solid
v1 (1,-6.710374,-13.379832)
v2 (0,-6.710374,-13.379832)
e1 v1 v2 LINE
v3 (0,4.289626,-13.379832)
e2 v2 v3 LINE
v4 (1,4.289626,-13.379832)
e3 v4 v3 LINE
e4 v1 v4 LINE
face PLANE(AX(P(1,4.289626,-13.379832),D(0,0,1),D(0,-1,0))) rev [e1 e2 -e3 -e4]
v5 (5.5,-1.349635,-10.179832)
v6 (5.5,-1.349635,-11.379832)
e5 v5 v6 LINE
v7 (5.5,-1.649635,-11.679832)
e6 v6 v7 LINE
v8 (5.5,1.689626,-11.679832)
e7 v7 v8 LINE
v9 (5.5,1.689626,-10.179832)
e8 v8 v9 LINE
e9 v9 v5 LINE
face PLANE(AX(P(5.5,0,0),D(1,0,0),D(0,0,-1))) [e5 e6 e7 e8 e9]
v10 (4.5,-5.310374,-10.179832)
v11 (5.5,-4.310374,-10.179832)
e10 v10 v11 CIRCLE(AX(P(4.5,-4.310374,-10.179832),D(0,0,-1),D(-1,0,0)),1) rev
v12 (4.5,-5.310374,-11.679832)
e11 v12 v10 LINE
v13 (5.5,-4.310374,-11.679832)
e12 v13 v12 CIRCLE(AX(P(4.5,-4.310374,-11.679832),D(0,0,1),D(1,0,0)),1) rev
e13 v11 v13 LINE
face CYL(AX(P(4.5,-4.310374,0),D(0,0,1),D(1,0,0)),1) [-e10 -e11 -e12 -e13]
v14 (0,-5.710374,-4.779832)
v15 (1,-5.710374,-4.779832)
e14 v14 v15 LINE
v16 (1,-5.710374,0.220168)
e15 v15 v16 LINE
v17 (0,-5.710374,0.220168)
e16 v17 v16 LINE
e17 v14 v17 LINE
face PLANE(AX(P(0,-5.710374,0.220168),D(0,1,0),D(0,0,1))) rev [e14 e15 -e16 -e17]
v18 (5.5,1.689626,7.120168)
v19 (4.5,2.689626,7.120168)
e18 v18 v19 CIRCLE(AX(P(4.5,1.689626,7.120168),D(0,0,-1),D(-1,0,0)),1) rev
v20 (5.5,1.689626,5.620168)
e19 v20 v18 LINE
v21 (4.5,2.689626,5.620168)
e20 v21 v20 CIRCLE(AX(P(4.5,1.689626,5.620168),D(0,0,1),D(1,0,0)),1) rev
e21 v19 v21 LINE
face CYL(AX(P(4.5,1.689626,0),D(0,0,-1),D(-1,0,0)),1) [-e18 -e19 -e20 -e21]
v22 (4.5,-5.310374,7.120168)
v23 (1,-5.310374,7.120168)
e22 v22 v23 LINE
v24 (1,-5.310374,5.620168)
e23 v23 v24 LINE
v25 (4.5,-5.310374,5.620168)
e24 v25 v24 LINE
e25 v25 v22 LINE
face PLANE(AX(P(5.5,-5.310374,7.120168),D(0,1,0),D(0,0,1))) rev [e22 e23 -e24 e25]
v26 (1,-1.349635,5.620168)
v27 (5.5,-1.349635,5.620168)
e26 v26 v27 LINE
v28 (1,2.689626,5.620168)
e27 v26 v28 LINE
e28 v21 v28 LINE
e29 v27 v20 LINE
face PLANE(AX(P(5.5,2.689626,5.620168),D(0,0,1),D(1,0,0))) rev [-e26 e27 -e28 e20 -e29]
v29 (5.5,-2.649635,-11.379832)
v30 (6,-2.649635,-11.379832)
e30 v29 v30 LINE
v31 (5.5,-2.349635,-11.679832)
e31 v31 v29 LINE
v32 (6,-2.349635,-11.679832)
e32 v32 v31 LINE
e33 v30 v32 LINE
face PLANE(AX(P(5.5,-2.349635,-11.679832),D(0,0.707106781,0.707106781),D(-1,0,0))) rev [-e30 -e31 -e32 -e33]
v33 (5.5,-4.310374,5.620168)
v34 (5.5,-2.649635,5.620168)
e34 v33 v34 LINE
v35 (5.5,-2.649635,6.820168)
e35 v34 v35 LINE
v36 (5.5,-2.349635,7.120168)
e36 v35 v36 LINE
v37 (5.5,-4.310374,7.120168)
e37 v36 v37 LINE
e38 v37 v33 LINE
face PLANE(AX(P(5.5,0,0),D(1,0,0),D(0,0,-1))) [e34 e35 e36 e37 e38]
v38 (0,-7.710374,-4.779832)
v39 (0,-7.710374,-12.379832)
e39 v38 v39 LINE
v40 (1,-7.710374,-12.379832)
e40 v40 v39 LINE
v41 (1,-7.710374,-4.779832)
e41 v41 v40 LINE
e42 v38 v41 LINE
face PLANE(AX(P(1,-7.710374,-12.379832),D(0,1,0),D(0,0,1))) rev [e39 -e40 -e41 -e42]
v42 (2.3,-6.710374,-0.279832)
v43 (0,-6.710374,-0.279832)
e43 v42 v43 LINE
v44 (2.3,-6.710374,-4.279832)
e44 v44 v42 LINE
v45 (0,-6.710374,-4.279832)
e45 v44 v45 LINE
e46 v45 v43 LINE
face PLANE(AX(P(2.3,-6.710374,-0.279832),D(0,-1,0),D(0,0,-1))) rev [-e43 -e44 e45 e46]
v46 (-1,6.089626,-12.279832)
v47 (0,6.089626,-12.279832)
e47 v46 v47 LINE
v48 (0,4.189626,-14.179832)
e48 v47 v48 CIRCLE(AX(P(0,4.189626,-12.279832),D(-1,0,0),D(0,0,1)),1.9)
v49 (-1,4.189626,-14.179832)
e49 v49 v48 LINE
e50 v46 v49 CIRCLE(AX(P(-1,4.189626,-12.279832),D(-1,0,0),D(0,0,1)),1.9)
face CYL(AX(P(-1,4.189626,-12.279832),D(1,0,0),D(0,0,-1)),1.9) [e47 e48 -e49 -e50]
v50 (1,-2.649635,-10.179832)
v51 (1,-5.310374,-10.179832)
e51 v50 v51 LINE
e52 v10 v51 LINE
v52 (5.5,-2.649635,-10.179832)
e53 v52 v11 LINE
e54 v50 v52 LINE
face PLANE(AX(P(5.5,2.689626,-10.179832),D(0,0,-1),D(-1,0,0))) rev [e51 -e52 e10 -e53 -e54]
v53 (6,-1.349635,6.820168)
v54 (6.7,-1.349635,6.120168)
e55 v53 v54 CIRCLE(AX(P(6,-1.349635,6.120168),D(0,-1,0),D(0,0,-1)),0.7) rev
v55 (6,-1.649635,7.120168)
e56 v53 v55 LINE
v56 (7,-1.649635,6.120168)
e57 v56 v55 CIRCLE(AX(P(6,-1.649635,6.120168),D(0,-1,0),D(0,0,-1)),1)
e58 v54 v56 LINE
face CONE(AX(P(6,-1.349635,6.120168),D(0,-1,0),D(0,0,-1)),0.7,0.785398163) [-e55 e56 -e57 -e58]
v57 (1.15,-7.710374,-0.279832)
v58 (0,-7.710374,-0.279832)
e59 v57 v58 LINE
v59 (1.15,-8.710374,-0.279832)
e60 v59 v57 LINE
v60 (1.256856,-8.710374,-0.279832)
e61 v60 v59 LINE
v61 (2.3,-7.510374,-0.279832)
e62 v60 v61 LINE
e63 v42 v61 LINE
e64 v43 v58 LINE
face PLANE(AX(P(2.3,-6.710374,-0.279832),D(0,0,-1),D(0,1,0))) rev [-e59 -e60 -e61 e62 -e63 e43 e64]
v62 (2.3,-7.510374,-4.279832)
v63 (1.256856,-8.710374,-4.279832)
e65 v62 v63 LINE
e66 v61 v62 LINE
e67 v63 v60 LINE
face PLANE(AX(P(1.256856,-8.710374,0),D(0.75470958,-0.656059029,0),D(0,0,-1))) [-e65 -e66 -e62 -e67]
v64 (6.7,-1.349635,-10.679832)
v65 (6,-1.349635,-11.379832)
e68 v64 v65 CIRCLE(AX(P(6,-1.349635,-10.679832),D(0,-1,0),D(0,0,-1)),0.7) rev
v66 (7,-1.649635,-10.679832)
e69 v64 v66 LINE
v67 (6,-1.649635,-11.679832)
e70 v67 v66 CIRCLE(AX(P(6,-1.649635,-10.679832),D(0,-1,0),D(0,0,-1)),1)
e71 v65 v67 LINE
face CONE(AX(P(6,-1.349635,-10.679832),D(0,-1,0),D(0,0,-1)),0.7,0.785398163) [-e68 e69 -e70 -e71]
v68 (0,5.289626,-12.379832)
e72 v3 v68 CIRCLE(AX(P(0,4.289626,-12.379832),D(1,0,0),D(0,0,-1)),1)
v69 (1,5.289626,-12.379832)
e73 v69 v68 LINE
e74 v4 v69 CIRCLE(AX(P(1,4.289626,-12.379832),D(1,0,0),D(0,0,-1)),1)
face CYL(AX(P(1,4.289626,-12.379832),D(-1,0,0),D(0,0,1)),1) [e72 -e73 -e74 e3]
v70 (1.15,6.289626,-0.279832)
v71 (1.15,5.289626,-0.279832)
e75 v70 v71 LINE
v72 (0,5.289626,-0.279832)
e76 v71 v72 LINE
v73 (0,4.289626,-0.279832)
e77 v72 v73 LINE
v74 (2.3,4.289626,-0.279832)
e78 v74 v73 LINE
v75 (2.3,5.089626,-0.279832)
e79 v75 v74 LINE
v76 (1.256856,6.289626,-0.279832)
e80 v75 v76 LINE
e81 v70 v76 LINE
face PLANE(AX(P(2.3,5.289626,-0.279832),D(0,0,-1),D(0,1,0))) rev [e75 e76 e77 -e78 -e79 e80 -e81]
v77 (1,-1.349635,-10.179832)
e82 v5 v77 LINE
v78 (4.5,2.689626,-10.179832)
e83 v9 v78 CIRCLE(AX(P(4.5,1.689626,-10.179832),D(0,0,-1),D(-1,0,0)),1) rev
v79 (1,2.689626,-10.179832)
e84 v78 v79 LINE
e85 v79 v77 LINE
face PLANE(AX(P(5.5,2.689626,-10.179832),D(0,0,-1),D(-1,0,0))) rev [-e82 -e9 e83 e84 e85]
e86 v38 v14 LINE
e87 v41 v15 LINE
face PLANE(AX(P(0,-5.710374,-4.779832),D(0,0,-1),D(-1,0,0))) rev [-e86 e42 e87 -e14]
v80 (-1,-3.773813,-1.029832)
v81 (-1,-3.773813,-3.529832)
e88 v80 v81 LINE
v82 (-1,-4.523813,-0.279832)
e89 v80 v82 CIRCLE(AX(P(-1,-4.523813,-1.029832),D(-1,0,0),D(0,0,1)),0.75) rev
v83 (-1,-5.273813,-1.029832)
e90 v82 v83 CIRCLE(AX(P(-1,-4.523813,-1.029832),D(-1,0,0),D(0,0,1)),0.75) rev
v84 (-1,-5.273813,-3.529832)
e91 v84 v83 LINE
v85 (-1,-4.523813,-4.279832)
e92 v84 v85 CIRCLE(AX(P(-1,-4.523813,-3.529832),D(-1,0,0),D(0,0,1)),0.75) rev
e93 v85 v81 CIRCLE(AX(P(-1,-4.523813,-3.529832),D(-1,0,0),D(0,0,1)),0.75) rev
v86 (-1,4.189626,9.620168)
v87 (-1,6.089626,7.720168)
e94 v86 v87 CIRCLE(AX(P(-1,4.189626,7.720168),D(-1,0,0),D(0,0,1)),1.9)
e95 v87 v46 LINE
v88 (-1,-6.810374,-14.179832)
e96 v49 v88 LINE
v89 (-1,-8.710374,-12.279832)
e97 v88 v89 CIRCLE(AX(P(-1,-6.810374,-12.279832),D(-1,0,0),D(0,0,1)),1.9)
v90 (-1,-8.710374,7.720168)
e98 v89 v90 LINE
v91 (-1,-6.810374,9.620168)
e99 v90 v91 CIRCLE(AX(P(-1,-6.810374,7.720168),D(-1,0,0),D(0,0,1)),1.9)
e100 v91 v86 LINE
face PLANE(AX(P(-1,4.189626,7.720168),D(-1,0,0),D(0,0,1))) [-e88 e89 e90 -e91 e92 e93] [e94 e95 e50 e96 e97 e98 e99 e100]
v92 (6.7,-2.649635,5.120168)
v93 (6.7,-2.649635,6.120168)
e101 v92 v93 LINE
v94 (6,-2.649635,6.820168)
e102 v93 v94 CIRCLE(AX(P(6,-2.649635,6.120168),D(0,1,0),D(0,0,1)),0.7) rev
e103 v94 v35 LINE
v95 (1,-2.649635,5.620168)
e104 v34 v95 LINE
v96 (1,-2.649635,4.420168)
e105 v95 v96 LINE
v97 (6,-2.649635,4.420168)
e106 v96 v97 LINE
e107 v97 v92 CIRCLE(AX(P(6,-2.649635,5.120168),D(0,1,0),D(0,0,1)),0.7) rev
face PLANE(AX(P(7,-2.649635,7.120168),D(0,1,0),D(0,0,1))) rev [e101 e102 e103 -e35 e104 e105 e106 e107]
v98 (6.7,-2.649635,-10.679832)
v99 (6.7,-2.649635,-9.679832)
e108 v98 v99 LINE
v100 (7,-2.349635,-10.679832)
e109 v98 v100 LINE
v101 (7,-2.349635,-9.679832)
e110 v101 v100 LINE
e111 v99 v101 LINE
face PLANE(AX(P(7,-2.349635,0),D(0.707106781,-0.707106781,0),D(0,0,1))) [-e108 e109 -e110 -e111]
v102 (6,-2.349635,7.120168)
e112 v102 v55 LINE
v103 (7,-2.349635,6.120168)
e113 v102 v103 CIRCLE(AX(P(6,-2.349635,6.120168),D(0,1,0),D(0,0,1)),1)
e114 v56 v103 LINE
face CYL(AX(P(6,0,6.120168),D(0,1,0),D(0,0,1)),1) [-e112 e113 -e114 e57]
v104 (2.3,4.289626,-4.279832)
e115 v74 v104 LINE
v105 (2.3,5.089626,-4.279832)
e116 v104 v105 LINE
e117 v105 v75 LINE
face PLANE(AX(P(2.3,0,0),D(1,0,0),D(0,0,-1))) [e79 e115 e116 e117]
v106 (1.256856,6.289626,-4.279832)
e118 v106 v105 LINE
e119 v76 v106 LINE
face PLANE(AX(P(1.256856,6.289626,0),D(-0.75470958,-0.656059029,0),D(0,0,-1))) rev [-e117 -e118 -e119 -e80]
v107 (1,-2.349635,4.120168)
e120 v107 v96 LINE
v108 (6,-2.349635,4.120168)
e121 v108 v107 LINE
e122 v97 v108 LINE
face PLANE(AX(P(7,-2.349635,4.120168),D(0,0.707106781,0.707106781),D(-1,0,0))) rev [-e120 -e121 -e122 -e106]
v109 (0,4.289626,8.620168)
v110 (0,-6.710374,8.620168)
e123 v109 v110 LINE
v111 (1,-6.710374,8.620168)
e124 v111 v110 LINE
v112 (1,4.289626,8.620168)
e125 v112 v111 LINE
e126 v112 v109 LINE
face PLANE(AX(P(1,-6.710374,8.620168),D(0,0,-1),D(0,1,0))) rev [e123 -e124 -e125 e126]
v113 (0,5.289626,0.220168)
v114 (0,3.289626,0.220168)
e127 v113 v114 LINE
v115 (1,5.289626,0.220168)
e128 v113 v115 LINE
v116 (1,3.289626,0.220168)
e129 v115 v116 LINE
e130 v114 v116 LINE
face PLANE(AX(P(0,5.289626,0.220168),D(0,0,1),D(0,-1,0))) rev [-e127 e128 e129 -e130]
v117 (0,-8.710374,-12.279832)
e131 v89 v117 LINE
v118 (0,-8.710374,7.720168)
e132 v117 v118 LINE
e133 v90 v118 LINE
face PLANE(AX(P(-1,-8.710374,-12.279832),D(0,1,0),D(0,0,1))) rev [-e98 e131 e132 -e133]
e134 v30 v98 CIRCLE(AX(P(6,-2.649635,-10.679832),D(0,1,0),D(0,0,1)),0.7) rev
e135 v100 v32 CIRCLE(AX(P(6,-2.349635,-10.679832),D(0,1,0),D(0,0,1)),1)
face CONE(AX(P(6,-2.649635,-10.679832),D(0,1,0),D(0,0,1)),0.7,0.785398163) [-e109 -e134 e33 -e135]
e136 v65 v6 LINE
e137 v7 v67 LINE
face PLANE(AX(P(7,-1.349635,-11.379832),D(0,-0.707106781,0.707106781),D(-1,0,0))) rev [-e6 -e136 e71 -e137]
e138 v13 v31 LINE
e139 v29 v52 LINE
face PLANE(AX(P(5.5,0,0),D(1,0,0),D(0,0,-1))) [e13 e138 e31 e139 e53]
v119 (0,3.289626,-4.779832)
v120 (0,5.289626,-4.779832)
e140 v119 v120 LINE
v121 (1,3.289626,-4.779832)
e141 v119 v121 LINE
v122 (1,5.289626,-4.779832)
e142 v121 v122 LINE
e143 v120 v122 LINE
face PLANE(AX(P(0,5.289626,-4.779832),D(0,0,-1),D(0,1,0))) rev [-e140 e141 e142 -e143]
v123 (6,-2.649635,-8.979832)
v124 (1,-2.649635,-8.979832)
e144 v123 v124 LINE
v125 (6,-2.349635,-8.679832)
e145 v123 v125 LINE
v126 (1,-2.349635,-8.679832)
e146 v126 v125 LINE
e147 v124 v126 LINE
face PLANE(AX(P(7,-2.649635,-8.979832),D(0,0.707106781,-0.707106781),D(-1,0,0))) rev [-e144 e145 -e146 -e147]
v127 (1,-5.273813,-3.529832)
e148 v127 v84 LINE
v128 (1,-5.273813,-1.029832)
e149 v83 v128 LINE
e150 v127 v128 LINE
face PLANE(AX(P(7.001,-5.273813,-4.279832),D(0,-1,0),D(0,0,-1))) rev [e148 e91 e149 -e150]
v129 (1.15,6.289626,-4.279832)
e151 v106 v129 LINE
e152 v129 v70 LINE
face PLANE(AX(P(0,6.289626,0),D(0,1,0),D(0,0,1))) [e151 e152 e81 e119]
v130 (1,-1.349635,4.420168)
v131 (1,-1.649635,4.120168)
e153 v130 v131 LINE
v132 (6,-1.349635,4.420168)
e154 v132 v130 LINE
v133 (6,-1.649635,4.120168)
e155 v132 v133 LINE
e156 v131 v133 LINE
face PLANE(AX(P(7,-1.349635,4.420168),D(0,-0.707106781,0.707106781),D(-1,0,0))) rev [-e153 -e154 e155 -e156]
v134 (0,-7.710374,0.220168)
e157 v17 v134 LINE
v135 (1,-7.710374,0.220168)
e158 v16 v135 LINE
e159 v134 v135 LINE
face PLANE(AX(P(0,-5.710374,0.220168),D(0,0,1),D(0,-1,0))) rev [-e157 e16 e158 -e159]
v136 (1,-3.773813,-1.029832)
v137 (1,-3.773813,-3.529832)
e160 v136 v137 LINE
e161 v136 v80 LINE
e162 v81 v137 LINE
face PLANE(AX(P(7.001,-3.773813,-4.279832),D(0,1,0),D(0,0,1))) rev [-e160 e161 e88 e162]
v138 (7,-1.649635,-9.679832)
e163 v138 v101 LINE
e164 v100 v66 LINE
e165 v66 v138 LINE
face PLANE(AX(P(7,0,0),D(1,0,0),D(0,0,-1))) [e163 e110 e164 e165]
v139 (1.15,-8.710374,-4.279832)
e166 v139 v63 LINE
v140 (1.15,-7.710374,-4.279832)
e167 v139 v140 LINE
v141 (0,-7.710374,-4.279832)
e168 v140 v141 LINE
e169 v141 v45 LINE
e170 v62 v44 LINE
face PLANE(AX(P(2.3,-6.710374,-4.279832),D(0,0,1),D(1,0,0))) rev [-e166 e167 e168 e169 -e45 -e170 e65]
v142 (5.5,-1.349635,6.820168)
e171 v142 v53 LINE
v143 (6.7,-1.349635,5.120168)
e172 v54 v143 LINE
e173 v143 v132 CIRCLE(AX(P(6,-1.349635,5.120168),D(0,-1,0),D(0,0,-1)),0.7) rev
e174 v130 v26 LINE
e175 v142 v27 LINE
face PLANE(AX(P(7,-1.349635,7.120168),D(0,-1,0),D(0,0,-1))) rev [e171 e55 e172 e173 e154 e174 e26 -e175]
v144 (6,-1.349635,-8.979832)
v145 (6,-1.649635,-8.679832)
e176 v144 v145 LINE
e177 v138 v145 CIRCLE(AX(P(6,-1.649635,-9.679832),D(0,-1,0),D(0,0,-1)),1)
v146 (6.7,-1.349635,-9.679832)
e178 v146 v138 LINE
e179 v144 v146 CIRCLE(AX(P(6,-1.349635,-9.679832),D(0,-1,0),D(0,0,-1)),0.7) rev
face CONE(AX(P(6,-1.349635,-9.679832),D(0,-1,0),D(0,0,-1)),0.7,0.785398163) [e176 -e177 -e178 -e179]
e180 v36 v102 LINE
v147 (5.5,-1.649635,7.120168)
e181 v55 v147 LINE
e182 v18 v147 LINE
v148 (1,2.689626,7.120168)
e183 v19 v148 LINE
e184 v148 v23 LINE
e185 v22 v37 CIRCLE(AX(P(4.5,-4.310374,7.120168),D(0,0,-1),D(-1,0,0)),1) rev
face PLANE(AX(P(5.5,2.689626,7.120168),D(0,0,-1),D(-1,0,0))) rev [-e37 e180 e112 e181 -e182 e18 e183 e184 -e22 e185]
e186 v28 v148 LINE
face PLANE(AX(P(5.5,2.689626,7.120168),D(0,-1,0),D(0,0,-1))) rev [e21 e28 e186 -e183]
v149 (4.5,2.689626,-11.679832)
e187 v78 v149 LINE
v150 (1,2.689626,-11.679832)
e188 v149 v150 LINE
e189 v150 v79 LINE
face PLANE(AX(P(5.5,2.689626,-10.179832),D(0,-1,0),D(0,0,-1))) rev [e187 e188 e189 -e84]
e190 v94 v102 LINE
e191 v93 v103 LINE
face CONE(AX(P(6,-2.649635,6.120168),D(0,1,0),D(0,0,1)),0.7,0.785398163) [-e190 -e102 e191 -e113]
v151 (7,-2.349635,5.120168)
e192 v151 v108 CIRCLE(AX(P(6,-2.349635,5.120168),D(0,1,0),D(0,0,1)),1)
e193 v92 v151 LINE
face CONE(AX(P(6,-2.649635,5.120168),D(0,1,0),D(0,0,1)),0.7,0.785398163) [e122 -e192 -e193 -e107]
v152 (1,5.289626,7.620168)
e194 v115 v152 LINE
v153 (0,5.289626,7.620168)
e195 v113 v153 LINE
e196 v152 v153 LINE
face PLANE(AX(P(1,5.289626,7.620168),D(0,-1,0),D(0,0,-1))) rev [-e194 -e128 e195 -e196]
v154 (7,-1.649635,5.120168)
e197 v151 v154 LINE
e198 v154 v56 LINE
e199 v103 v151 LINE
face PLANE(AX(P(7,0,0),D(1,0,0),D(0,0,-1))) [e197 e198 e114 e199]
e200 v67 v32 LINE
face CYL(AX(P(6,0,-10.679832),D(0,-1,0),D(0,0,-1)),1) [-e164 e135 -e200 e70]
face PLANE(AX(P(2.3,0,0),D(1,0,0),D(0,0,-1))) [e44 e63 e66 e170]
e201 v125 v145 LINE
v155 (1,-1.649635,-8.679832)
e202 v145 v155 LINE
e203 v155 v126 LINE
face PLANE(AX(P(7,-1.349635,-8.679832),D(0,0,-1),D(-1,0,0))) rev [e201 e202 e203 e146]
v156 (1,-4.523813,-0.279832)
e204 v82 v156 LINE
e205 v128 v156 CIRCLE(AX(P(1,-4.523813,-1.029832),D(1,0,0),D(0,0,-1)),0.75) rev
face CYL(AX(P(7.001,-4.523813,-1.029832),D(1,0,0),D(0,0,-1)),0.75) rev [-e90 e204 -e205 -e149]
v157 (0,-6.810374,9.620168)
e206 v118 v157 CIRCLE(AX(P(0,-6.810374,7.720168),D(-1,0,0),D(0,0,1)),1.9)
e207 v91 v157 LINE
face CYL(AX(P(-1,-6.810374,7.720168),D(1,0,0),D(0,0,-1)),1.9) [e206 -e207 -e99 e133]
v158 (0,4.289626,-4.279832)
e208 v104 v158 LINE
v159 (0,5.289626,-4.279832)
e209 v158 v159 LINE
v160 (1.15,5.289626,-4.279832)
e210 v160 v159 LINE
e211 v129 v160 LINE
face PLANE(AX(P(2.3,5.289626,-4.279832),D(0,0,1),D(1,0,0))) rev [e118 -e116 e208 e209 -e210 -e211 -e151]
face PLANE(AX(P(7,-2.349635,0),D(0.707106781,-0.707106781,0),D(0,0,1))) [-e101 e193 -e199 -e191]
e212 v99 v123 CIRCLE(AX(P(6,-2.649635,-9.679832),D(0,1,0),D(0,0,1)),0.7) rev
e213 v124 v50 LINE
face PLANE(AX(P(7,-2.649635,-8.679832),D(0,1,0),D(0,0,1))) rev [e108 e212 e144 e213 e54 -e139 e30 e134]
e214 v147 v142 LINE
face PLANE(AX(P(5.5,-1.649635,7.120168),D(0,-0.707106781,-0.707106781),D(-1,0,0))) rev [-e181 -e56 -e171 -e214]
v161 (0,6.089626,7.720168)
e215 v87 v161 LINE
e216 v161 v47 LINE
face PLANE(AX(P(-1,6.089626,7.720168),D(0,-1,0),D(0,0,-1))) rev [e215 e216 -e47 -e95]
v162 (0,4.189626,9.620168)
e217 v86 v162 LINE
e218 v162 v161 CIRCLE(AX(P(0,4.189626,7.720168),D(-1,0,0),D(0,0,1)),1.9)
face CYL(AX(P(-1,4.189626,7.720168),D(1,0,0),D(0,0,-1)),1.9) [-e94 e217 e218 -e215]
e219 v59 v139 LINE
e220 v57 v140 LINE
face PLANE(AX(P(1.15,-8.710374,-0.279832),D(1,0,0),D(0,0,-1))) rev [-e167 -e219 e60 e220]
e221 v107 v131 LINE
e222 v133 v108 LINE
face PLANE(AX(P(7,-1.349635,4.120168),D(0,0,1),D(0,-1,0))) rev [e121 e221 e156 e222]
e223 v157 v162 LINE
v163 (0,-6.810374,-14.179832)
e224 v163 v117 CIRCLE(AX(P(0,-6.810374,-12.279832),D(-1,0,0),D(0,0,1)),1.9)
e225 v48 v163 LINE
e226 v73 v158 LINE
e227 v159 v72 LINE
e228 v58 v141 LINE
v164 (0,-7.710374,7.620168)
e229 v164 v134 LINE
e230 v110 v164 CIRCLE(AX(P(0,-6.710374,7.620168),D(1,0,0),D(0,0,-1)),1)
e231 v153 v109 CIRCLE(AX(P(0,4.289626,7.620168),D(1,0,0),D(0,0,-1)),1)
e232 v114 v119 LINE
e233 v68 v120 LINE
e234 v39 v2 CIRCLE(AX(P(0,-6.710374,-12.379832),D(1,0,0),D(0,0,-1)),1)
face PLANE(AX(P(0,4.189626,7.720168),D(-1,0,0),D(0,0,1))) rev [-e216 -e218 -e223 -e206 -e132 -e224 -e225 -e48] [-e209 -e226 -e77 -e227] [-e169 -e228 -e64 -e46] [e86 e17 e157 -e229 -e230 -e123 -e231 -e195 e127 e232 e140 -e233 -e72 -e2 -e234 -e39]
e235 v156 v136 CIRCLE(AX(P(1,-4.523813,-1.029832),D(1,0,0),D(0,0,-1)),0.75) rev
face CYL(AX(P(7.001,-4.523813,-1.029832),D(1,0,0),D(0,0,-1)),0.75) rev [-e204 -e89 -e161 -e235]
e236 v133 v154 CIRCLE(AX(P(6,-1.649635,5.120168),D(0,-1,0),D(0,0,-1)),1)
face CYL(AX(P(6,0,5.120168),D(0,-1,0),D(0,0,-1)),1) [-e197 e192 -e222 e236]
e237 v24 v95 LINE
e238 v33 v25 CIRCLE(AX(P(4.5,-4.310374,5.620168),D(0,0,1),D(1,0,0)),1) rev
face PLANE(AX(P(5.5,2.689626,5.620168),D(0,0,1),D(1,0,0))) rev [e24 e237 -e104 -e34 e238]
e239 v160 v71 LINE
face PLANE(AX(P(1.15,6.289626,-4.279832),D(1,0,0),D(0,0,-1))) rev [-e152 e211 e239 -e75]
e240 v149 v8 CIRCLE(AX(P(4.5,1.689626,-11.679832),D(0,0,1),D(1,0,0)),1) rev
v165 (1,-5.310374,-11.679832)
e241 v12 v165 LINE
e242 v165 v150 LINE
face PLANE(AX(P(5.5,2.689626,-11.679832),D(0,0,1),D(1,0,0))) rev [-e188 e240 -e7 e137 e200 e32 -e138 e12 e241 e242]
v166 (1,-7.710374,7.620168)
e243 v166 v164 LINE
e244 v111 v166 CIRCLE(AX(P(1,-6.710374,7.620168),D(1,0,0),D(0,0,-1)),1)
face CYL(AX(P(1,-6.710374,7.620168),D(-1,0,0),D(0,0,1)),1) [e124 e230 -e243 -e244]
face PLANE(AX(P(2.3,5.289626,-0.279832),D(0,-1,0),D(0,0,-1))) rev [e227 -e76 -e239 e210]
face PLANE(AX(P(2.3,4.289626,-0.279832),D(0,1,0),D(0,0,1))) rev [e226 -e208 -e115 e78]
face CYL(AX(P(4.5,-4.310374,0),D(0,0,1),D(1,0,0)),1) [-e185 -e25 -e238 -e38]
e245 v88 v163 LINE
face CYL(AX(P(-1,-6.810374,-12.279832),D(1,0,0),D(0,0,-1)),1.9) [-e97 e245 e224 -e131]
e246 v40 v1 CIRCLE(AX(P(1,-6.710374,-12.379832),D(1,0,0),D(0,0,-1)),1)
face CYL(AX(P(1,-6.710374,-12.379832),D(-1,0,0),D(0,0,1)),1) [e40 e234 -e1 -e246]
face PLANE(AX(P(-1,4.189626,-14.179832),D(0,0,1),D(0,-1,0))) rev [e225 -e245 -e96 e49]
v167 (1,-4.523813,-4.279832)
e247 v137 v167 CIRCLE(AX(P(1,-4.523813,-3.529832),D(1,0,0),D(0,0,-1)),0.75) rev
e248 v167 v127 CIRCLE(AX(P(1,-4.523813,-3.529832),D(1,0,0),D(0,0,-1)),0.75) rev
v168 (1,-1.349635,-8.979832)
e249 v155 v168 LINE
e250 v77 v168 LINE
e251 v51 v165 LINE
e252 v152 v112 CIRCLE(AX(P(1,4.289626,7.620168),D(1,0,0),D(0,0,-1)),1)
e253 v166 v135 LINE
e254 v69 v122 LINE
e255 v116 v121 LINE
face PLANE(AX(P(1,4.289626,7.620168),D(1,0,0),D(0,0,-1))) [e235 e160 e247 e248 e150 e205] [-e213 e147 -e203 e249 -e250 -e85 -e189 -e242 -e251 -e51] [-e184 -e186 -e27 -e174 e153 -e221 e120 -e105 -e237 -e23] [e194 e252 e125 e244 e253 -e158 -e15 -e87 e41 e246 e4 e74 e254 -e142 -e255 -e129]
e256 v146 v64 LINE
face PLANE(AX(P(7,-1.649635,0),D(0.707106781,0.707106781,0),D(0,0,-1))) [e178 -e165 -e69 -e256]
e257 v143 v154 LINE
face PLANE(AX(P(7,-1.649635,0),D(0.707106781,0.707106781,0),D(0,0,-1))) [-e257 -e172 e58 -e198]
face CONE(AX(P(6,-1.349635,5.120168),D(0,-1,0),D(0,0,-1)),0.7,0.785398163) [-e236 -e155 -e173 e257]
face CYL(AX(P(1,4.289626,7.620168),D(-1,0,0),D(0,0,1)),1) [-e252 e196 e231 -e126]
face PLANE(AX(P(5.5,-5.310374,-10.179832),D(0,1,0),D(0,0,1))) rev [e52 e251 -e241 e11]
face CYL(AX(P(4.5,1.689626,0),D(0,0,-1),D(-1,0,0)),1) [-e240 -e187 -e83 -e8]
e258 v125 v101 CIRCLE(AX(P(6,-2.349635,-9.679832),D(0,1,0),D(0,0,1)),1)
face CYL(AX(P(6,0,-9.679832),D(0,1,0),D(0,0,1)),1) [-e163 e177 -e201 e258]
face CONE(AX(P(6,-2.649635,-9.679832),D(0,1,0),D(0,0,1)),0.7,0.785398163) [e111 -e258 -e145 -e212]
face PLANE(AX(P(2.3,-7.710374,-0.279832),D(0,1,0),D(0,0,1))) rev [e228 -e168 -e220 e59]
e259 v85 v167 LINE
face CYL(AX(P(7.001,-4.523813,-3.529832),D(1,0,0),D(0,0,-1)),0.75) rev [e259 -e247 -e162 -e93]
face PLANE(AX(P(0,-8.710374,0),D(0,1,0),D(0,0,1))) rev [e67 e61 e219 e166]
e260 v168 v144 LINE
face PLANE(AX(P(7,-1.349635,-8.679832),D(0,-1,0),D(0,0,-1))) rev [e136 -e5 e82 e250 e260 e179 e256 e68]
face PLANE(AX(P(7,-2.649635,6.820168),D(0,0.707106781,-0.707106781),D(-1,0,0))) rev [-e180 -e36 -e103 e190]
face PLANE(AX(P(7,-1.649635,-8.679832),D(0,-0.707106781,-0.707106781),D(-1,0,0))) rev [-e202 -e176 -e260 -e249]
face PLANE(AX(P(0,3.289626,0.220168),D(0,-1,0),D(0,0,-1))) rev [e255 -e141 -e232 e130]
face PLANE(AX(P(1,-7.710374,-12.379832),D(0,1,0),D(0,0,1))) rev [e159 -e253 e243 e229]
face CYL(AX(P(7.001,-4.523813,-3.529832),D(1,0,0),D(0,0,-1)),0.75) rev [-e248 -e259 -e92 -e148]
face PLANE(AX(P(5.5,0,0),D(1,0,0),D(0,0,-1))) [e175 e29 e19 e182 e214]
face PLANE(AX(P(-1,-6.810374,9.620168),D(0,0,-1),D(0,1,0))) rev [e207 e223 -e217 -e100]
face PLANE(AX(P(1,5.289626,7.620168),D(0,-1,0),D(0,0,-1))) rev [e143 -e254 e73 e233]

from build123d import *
from OCP.BRepFilletAPI import BRepFilletAPI_MakeChamfer

# Parameters (mm, degrees)
EXTRUDE_1_DEPTH     = 1
EXTRUDE_2_DEPTH     = 1
SKETCH_3_W          = 1.5
SKETCH_3_H          = 8
EXTRUDE_3_DEPTH     = 4.5
SKETCH_4_W          = 3
SKETCH_4_H          = 1.3
EXTRUDE_4_DEPTH     = 6
FILLET_1_R          = 1
CHAMFER_1_SIZE      = 0.3
SKETCH_5_W          = 5
SKETCH_5_H          = 2
CUT_EXTRUDE_1_DEPTH = 1
SKETCH_6_W          = 4
SKETCH_6_H          = 1
EXTRUDE_5_DEPTH     = 2.3
SKETCH_7_W          = 1.15
SKETCH_7_H          = 4
EXTRUDE_6_DEPTH     = 1
CUT_EXTRUDE_2_REACH = 20.465
SKETCH_10_W         = 4
SKETCH_10_H         = 1.5
FILLET_2_R          = 0.75
SKETCH_11_W         = 1.15
SKETCH_11_H         = 4
EXTRUDE_7_DEPTH     = 1
CHAMFER_2_SIZE      = 1.2
CHAMFER_2_SIZE2     = 1.043144085


with BuildPart() as part:
    # 草图1 → 凸台-拉伸1 (new body)
    with BuildSketch(Plane(origin=(0, 0, 0), x_dir=(0, 0, -1), z_dir=(1, 0, 0))):
        with BuildLine():
            Line((-8.62016793, -6.710374314), (-8.62016793, 4.289625686))
            ThreePointArc((-8.62016793, 4.289625686), (-8.327274711, 4.996732467), (-7.62016793, 5.289625686))
            Line((-7.62016793, 5.289625686), (12.37983207, 5.289625686))
            ThreePointArc((12.37983207, 5.289625686), (13.086938851, 4.996732467), (13.37983207, 4.289625686))
            Line((13.37983207, 4.289625686), (13.37983207, -6.710374314))
            ThreePointArc((13.37983207, -6.710374314), (13.086938851, -7.417481096), (12.37983207, -7.710374314))
            Line((12.37983207, -7.710374314), (-7.62016793, -7.710374314))
            ThreePointArc((-7.62016793, -7.710374314), (-8.327274711, -7.417481096), (-8.62016793, -6.710374314))
        make_face()
    extrude(amount=EXTRUDE_1_DEPTH)

    # 草图2 → 凸台-拉伸2 (add)
    with BuildSketch(Plane.ZY):
        with BuildLine():
            Line((9.62016793, -6.810374314), (9.62016793, 4.189625686))
            ThreePointArc((9.62016793, 4.189625686), (9.063670815, 5.53312857), (7.72016793, 6.089625686))
            Line((7.72016793, 6.089625686), (-12.27983207, 6.089625686))
            ThreePointArc((-12.27983207, 6.089625686), (-13.623334954, 5.53312857), (-14.17983207, 4.189625686))
            Line((-14.17983207, 4.189625686), (-14.17983207, -6.810374314))
            ThreePointArc((-14.17983207, -6.810374314), (-13.623334954, -8.153877199), (-12.27983207, -8.710374314))
            Line((-12.27983207, -8.710374314), (7.72016793, -8.710374314))
            ThreePointArc((7.72016793, -8.710374314), (9.063670815, -8.153877199), (9.62016793, -6.810374314))
        make_face()
    extrude(amount=EXTRUDE_2_DEPTH)

    # 草图3 → 凸台-拉伸3 (add)
    with BuildSketch(Plane(origin=(1, 0, 0), x_dir=(0, 0, -1), z_dir=(1, 0, 0))):
        with Locations((-6.37016793, -1.310374314)):
            Rectangle(SKETCH_3_W, SKETCH_3_H)
        with Locations((10.92983207, -1.310374314)):
            Rectangle(SKETCH_3_W, SKETCH_3_H)
    extrude(amount=EXTRUDE_3_DEPTH)

    # 草图4 → 凸台-拉伸4 (add)
    with BuildSketch(Plane(origin=(1, 0, 0), x_dir=(0, 0, -1), z_dir=(1, 0, 0))):
        with Locations((-5.62016793, -1.999635097)):
            Rectangle(SKETCH_4_W, SKETCH_4_H)
        with Locations((10.17983207, -1.999635097)):
            Rectangle(SKETCH_4_W, SKETCH_4_H)
    extrude(amount=EXTRUDE_4_DEPTH)

    # 圆角1
    fillet_1_edges = [part.edges().sort_by_distance(p)[0] for p in [
        (7, -1.999635097, -8.67983207),
        (7, -1.999635097, -11.67983207),
        (5.5, -5.310374314, 6.37016793),
        (5.5, 2.689625686, 6.37016793),
        (5.5, -5.310374314, -10.92983207),
        (5.5, 2.689625686, -10.92983207),
        (7, -1.999635097, 7.12016793),
        (7, -1.999635097, 4.12016793),
    ]]
    fillet(fillet_1_edges, radius=FILLET_1_R)

    # 倒角1
    chamfer_1_edges = [part.edges().sort_by_distance(p)[0] for p in [
        (5.75, -2.649635097, 7.12016793),
        (5.75, -1.349635097, 7.12016793),
        (5.75, -1.349635097, -11.67983207),
        (5.75, -2.649635097, -11.67983207),
        (7, -2.649635097, -10.17983207),
        (7, -1.349635097, -10.17983207),
        (3.5, -2.649635097, -8.67983207),
        (6.707106781, -2.649635097, -11.386938851),
        (6.707106781, -2.649635097, -8.972725289),
        (3.5, -1.349635097, -8.67983207),
        (6.707106781, -1.349635097, -11.386938851),
        (6.707106781, -1.349635097, -8.972725289),
        (7, -2.649635097, 5.62016793),
        (7, -1.349635097, 5.62016793),
        (3.5, -2.649635097, 4.12016793),
        (6.707106781, -2.649635097, 4.413061149),
        (6.707106781, -2.649635097, 6.827274711),
        (3.5, -1.349635097, 4.12016793),
        (6.707106781, -1.349635097, 4.413061149),
        (6.707106781, -1.349635097, 6.827274711),
    ]]
    chamfer(chamfer_1_edges, length=CHAMFER_1_SIZE)

    # 草图5 → 切除-拉伸1 (cut)
    with BuildSketch(Plane(origin=(1, 0, 0), x_dir=(0, 0, -1), z_dir=(1, 0, 0))):
        with Locations((2.27983207, -6.710374314)):
            Rectangle(SKETCH_5_W, SKETCH_5_H)
        with Locations((2.27983207, 4.289625686)):
            Rectangle(SKETCH_5_W, SKETCH_5_H)
    extrude(amount=-CUT_EXTRUDE_1_DEPTH, mode=Mode.SUBTRACT)

    # 草图6 → 凸台-拉伸5 (add)
    with BuildSketch(Plane(origin=(0, 0, 0), x_dir=(0, 0, -1), z_dir=(1, 0, 0))):
        with Locations((2.27983207, -7.210374314)):
            Rectangle(SKETCH_6_W, SKETCH_6_H)
        with Locations((2.27983207, 4.789625686)):
            Rectangle(SKETCH_6_W, SKETCH_6_H)
    extrude(amount=EXTRUDE_5_DEPTH)

    # 草图7 → 凸台-拉伸6 (add)
    with BuildSketch(Plane.XZ.offset(7.710374314)):
        with Locations((1.725, -2.27983207)):
            Rectangle(SKETCH_7_W, SKETCH_7_H)
    extrude(amount=EXTRUDE_6_DEPTH)

    # 草图10 → 切除-拉伸2 (cut, up to next)
    with BuildSketch(Plane.ZY.offset(1), mode=Mode.PRIVATE) as cut_extrude_2_sk1:
        with Locations((-2.27983207, -4.523813103)):
            Rectangle(SKETCH_10_W, SKETCH_10_H)
    cut_extrude_2_tool1 = extrude(cut_extrude_2_sk1.sketch, amount=-CUT_EXTRUDE_2_REACH, mode=Mode.PRIVATE) & part.part
    add(cut_extrude_2_tool1.solids().sort_by_distance((-1, -4.523813, -2.279832))[0], mode=Mode.SUBTRACT)

    # 圆角2
    fillet_2_edges = [part.edges().sort_by_distance(p)[0] for p in [
        (0, -5.273813103, -0.27983207),
        (0, -3.773813103, -0.27983207),
        (0, -3.773813103, -4.27983207),
        (0, -5.273813103, -4.27983207),
    ]]
    fillet(fillet_2_edges, radius=FILLET_2_R - 0.0001)  # a hair under: the kernel refuses the full size

    # 草图11 → 凸台-拉伸7 (add)
    with BuildSketch(Plane(origin=(0, 5.289625686, 0), x_dir=(1, 0, 0), z_dir=(0, 1, 0))):
        with Locations((1.725, 2.27983207)):
            Rectangle(SKETCH_11_W, SKETCH_11_H)
    extrude(amount=EXTRUDE_7_DEPTH)

    # 倒角2: one chamfer whose edges measure the first distance from different faces: ONE call of the kernel's chamfer builder (chamfer() names one face for all edges)
    chamfer_2_edges_1 = [part.edges().sort_by_distance(p)[0] for p in [
        (2.3, -8.710374314, -2.27983207),
    ]]
    chamfer_2_side_1 = [part.faces().sort_by_distance(p)[0] for p in [
        (2.3, -7.710374314, -2.27983207),
    ]]
    chamfer_2_edges_2 = [part.edges().sort_by_distance(p)[0] for p in [
        (2.3, 6.289625686, -2.27983207),
    ]]
    chamfer_2_side_2 = [part.faces().sort_by_distance(p)[0] for p in [
        (2.3, 5.289625686, -2.27983207),
    ]]
    chamfer_2 = BRepFilletAPI_MakeChamfer(part.part.solid().wrapped)
    for e in chamfer_2_edges_1:
        chamfer_2.Add(CHAMFER_2_SIZE, CHAMFER_2_SIZE2, e.wrapped, chamfer_2_side_1[0].wrapped)  # the first distance lies on this face
    for e in chamfer_2_edges_2:
        chamfer_2.Add(CHAMFER_2_SIZE, CHAMFER_2_SIZE2, e.wrapped, chamfer_2_side_2[0].wrapped)  # the first distance lies on this face
    add(Compound.cast(chamfer_2.Shape()), mode=Mode.REPLACE)


solid = part.part
